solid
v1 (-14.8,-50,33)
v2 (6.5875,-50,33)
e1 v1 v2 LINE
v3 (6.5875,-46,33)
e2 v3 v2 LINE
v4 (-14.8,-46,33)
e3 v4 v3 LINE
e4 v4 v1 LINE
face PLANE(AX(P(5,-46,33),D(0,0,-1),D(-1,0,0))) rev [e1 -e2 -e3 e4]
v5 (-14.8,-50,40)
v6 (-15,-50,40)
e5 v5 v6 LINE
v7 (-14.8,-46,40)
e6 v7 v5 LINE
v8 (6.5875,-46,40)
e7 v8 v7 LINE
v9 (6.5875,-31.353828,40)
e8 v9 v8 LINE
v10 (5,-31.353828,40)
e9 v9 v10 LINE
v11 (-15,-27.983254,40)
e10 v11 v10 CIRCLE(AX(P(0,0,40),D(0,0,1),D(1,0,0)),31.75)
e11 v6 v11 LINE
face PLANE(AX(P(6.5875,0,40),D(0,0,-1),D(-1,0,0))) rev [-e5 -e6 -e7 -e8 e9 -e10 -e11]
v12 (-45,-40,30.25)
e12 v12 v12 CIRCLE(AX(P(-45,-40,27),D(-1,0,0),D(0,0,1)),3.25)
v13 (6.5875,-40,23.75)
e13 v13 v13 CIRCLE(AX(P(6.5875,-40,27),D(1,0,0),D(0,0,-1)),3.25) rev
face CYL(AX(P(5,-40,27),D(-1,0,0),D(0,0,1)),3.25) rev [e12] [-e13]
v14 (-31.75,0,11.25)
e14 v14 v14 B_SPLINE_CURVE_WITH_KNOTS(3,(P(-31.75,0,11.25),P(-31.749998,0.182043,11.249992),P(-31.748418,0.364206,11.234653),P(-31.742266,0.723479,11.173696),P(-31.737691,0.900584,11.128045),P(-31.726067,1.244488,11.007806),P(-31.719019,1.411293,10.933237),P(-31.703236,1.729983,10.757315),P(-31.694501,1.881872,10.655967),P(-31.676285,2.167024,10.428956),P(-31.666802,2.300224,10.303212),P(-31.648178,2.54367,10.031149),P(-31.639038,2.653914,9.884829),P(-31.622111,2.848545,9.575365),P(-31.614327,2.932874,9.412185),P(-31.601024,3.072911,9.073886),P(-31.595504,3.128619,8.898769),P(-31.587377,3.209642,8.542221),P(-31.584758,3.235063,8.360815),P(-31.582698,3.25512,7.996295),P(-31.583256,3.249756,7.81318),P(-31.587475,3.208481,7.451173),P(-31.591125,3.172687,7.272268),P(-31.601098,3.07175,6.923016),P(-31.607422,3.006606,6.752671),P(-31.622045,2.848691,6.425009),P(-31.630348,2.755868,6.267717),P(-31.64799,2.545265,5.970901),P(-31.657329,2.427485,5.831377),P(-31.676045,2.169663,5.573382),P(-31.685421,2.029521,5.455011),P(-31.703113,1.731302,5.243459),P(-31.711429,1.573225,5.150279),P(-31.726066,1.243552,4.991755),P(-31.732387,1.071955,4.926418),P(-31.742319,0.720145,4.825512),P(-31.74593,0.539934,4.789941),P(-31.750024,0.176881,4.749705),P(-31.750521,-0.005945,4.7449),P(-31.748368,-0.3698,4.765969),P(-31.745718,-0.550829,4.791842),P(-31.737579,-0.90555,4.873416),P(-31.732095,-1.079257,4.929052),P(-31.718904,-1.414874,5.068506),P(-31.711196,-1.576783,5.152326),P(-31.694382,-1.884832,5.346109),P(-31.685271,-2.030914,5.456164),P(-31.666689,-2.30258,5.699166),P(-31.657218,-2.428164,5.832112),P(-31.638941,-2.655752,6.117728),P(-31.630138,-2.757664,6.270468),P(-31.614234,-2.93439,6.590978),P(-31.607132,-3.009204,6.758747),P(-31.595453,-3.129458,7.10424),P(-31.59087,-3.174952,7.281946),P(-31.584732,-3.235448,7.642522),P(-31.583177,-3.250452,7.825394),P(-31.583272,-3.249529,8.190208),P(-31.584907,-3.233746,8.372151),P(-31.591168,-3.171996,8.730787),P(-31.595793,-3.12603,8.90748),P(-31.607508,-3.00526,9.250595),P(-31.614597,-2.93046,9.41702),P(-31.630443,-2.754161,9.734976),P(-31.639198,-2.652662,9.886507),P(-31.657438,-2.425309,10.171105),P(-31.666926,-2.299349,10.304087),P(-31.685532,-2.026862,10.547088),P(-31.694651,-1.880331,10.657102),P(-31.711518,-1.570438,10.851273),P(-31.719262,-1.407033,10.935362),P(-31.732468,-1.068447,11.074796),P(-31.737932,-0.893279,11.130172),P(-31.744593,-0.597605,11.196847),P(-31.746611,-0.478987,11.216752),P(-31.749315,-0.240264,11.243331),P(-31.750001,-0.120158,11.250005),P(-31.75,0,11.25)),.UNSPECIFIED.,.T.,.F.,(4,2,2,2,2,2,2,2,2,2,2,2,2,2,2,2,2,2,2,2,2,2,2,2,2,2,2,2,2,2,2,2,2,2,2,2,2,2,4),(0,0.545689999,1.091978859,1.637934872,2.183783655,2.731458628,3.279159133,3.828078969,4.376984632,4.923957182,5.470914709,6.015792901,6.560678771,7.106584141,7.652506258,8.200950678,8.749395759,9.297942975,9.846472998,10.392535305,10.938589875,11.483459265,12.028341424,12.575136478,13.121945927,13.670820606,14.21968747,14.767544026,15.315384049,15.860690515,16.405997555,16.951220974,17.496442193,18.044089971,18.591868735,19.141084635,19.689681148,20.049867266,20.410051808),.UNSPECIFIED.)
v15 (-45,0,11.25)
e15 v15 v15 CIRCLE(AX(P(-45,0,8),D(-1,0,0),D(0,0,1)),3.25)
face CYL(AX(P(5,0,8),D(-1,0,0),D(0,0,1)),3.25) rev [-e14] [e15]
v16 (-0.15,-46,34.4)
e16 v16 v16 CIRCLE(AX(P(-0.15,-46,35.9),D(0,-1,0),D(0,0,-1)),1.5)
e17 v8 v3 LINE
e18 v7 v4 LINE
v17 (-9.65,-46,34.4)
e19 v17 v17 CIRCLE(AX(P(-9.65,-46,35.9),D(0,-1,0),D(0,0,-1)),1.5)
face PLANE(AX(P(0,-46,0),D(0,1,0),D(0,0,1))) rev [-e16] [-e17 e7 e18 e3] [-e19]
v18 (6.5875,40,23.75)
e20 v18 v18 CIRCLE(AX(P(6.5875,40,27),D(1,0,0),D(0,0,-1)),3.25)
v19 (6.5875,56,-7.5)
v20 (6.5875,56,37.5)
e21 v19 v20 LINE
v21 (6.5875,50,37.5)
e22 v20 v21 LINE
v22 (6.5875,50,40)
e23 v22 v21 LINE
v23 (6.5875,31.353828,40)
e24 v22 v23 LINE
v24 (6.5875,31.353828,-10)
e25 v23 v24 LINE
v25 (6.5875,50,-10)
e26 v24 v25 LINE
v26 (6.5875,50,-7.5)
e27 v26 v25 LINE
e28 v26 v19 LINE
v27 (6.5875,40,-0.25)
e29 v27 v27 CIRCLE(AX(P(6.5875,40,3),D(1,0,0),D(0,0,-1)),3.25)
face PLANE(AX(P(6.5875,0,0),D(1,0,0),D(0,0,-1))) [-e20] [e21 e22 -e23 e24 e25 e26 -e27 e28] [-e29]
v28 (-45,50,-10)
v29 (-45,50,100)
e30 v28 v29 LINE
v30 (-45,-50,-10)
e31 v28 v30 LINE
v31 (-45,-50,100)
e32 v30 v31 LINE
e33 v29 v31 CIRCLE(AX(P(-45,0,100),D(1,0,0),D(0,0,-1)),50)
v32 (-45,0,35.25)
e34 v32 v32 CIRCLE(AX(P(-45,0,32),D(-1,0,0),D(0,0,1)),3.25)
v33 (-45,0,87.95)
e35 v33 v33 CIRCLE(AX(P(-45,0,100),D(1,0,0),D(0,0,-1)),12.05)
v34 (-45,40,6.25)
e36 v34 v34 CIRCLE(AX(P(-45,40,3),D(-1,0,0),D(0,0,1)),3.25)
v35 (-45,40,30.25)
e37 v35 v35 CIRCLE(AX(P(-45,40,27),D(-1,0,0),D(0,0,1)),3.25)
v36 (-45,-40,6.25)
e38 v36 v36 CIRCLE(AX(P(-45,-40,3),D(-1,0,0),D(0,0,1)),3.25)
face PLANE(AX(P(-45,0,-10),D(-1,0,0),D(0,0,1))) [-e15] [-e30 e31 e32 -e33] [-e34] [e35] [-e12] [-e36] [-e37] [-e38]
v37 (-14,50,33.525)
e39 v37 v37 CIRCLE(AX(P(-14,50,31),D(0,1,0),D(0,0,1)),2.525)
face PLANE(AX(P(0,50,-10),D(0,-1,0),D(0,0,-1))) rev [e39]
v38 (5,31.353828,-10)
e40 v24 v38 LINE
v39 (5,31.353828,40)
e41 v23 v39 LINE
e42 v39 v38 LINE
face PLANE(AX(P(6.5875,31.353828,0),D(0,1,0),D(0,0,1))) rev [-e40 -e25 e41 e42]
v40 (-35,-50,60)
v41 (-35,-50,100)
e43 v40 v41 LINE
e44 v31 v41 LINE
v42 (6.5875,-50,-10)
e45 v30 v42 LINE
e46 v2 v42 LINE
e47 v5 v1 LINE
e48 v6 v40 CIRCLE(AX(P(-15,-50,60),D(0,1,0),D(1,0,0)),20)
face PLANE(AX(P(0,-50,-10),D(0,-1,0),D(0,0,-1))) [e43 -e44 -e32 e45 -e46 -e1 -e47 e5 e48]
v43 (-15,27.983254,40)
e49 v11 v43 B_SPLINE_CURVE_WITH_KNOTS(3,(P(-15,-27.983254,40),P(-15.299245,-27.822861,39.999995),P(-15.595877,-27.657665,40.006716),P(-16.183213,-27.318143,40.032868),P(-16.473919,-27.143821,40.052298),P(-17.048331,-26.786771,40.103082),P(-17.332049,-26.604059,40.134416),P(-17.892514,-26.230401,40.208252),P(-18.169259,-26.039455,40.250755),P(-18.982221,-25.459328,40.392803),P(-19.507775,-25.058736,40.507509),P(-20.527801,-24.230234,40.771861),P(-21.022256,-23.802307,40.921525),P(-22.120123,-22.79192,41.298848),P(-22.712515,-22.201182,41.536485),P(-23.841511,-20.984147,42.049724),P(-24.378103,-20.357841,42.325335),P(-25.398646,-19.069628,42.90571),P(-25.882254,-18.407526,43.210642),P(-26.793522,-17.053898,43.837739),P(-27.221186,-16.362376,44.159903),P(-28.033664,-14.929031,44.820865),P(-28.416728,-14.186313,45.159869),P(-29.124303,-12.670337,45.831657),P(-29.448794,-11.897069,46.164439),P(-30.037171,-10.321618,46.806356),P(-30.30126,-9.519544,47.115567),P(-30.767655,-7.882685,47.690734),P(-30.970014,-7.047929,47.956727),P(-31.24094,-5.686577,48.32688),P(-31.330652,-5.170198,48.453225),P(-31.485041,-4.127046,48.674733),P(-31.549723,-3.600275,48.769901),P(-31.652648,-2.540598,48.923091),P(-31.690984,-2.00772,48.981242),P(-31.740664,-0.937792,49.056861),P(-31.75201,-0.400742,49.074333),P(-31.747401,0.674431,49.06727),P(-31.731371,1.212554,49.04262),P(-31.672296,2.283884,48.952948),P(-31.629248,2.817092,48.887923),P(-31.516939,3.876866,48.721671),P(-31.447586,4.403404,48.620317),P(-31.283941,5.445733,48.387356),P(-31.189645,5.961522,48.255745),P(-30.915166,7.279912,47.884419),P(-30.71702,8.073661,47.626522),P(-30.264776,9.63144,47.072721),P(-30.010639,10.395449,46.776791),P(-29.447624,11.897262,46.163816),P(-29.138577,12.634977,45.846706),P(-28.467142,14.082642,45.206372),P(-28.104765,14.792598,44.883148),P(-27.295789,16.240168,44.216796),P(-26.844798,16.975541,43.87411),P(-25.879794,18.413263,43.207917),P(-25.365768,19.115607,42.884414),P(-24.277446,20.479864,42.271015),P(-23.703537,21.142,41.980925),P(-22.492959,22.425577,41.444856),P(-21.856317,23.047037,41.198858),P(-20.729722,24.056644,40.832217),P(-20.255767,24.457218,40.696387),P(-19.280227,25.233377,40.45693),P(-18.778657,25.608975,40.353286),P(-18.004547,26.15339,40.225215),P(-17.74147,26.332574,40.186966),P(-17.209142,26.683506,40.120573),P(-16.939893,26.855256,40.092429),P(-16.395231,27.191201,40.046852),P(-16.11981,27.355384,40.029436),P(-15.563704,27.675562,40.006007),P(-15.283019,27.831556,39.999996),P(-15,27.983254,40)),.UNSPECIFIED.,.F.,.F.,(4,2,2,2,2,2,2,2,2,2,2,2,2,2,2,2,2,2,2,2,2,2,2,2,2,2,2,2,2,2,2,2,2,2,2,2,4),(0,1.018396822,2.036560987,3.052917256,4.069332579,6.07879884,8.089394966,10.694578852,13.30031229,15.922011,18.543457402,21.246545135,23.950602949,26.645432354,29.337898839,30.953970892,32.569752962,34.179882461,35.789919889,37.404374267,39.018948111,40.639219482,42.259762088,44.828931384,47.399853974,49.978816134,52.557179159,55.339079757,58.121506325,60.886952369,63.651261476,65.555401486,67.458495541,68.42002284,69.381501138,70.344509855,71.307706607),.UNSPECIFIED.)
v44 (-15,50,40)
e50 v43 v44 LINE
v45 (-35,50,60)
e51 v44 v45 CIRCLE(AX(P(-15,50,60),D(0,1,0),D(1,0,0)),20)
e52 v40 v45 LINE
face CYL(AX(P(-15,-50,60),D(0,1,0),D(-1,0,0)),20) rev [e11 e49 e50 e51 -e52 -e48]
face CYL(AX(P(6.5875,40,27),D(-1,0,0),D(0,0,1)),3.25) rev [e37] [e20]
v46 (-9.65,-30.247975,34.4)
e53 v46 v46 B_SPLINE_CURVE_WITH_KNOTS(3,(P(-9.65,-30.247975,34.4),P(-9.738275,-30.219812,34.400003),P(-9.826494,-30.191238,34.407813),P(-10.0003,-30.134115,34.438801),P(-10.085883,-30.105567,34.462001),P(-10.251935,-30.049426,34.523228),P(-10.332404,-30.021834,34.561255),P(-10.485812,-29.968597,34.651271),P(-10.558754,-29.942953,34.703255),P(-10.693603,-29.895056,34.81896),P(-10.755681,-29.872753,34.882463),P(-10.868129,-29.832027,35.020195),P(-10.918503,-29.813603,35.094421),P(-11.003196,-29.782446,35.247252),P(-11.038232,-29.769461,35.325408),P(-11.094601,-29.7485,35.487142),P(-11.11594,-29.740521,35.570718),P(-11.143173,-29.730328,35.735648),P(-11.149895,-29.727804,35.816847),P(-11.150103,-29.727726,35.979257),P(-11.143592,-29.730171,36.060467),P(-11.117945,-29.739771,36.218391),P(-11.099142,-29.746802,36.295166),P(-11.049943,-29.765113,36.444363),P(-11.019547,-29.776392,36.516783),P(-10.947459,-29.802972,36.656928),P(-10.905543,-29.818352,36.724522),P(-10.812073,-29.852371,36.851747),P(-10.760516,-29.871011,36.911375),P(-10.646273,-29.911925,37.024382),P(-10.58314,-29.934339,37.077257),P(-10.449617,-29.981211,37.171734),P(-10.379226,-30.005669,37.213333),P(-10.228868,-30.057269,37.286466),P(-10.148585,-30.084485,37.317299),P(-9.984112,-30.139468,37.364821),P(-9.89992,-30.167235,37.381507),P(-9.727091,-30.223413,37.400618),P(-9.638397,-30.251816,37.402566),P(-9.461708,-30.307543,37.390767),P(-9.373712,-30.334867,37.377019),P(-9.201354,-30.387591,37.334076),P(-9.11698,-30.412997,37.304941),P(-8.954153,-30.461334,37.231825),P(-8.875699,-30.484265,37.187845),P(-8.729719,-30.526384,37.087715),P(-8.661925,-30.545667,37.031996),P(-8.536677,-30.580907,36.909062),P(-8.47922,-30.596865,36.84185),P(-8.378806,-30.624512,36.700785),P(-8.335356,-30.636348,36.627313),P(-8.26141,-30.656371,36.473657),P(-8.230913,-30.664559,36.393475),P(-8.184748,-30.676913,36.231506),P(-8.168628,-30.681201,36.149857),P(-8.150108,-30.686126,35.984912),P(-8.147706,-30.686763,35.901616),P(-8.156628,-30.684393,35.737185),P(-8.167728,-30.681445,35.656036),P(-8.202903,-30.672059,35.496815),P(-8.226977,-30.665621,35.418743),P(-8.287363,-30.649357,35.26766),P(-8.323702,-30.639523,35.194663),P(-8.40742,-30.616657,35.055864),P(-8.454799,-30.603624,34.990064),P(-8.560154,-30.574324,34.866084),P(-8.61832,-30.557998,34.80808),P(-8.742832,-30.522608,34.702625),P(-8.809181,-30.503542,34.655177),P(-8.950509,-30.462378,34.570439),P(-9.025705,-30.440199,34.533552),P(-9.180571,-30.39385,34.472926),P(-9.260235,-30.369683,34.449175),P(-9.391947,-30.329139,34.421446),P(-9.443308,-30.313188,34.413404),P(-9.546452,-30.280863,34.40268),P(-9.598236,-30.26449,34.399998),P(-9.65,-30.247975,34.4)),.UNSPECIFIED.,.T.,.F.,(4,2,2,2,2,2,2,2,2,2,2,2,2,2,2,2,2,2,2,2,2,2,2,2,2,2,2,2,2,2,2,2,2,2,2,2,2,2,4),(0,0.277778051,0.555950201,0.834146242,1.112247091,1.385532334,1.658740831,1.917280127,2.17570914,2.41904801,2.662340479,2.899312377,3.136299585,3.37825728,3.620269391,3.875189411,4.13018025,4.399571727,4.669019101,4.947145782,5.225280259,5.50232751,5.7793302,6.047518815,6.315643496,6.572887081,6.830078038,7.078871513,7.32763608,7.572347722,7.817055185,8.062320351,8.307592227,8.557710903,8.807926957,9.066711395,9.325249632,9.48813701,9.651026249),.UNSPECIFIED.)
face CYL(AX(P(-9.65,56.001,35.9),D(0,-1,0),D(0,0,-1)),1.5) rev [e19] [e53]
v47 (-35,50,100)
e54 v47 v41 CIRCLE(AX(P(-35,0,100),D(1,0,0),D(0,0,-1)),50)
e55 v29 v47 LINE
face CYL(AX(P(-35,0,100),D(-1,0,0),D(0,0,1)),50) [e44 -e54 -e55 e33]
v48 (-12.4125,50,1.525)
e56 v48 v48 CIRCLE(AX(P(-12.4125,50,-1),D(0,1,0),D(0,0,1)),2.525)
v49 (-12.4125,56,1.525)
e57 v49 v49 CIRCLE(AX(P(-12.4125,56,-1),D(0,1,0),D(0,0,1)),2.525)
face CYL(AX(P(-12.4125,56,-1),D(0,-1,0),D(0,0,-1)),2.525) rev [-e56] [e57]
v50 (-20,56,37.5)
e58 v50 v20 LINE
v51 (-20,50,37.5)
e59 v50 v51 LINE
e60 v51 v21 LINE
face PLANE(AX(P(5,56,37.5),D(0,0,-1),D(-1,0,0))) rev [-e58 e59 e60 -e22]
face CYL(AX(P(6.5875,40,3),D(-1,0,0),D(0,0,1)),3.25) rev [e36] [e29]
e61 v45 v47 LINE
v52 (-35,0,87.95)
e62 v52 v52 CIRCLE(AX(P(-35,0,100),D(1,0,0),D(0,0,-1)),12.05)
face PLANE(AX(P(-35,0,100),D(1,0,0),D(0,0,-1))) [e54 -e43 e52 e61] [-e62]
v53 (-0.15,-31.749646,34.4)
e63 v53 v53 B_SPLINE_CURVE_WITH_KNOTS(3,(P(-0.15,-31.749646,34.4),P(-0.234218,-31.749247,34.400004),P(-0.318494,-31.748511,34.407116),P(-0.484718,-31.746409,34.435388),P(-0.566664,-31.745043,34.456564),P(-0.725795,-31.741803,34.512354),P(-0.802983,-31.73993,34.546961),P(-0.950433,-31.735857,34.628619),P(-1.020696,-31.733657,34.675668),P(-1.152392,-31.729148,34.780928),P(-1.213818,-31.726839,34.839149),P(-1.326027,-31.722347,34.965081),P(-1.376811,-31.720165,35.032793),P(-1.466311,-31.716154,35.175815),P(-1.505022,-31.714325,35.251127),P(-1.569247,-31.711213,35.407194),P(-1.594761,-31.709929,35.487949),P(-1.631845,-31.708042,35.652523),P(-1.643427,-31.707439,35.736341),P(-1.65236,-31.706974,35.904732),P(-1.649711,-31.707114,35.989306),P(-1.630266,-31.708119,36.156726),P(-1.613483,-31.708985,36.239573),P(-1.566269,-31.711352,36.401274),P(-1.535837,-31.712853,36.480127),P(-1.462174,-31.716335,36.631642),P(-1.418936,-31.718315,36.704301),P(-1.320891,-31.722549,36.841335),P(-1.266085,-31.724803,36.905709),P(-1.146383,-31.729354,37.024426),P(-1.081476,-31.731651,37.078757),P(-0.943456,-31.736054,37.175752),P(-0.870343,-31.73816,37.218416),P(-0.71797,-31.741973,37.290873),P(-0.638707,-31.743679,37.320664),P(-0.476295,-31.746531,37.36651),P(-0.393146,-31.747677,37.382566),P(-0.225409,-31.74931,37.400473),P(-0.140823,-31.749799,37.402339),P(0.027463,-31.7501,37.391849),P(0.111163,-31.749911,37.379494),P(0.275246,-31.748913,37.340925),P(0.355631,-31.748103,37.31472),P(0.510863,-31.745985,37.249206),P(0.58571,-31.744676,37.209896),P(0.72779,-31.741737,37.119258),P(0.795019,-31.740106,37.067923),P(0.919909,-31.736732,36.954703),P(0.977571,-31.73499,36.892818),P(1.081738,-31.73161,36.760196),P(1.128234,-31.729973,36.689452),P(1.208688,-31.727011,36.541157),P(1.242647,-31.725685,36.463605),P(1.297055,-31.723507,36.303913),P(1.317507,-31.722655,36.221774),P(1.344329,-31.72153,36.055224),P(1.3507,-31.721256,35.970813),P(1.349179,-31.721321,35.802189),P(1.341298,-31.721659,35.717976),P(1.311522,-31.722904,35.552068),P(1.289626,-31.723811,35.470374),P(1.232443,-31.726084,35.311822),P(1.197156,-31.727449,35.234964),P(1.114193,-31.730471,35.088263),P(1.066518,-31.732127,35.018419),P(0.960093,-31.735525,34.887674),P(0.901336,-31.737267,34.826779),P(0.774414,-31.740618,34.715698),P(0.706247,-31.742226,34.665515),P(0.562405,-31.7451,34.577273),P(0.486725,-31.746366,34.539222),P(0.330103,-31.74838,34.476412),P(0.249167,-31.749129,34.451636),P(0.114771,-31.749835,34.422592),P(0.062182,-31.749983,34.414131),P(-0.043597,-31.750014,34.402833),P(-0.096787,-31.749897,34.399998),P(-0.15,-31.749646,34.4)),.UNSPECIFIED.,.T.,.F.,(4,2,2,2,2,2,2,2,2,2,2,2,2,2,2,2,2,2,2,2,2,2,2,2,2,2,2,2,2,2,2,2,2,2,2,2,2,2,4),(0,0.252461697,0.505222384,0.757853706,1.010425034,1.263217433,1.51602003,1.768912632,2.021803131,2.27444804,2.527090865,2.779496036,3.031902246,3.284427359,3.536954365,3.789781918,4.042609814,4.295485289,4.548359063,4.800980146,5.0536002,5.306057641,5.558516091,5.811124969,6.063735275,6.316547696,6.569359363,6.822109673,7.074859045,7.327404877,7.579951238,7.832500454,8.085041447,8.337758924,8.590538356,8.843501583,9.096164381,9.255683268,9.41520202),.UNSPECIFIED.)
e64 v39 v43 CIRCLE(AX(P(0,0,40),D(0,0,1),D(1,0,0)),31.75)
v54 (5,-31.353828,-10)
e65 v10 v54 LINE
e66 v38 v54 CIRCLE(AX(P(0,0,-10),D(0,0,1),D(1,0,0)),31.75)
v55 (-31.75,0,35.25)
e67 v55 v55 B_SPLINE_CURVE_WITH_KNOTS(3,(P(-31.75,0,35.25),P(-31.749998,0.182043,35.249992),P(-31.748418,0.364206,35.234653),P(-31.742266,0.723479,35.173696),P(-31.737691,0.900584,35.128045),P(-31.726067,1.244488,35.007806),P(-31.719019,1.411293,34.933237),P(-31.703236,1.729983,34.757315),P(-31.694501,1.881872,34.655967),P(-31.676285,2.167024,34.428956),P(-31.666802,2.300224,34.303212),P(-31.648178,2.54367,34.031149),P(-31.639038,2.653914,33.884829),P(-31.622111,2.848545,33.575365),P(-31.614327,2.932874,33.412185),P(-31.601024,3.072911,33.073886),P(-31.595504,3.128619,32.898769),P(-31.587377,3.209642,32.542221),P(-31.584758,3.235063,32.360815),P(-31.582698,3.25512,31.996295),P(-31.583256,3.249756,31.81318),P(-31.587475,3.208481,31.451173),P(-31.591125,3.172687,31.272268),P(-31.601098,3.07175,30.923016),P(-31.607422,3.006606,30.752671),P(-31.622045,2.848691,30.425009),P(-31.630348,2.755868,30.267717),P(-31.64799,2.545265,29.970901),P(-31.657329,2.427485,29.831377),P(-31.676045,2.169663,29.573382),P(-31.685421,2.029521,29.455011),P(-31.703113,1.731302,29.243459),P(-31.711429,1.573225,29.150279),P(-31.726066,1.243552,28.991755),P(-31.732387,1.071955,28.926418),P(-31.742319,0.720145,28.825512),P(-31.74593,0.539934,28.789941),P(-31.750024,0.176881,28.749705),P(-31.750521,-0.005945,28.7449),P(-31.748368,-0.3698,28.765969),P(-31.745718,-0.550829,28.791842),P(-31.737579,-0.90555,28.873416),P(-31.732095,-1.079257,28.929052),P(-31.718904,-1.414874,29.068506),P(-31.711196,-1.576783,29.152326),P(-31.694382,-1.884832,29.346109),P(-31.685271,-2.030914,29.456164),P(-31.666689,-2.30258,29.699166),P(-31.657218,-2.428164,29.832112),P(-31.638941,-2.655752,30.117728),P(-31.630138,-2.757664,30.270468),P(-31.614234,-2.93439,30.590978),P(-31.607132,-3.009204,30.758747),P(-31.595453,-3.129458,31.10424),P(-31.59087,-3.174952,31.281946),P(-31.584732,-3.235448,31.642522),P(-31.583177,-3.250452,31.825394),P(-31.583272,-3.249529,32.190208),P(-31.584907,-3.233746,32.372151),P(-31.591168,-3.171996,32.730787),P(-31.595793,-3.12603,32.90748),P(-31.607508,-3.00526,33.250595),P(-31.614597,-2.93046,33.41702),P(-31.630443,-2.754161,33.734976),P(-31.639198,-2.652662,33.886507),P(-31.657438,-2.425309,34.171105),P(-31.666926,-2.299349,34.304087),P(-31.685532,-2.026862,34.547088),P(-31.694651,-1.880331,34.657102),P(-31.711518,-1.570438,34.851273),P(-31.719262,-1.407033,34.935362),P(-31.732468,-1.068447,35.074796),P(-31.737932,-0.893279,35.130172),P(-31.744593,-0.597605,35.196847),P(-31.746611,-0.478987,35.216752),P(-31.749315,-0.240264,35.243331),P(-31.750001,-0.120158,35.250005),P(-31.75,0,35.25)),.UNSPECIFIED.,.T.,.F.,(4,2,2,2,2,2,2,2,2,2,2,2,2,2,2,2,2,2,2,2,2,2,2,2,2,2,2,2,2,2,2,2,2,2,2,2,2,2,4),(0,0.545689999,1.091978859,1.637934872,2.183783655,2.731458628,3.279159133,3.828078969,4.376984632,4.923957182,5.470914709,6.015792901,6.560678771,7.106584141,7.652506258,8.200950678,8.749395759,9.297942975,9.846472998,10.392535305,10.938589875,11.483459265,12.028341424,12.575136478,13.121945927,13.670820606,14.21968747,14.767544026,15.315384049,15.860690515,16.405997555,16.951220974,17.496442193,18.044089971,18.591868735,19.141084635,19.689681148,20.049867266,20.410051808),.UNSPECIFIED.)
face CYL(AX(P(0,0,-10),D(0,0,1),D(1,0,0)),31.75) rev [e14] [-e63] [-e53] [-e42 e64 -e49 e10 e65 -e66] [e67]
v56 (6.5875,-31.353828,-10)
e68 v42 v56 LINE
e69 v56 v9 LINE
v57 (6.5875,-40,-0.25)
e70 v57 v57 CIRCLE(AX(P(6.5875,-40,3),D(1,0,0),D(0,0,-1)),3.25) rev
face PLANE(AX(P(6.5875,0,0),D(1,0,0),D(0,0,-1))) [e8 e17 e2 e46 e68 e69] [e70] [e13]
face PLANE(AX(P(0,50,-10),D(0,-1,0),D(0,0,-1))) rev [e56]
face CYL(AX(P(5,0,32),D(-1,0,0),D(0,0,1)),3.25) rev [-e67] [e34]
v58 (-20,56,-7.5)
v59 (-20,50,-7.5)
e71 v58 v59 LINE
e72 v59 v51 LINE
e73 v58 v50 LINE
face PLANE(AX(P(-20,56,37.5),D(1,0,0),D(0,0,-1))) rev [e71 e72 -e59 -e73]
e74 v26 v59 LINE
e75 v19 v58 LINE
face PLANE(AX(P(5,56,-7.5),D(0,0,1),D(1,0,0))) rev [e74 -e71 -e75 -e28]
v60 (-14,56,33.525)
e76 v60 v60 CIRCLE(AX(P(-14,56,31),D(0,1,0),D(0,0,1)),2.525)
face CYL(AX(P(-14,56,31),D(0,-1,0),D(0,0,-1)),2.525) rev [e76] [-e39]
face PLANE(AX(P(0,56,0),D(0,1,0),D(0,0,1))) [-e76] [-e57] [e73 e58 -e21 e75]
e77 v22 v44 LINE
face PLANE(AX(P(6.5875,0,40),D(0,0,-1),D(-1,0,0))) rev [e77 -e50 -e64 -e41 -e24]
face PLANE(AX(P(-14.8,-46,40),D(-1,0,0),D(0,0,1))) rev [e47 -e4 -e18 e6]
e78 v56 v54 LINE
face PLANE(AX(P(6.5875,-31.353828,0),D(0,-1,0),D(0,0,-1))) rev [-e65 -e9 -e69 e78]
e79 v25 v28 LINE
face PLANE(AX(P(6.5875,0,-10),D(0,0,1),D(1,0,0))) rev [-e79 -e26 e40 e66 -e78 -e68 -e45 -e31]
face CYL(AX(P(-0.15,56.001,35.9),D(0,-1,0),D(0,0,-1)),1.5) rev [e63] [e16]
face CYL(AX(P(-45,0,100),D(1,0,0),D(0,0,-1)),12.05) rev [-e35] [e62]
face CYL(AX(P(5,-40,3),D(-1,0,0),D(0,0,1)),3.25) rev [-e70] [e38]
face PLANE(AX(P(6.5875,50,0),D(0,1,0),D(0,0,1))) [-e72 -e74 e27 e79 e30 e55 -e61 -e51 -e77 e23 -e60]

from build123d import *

# Parameters (mm, degrees)
CENTRE_HOLE_FOR_L2_DEPTH      = 40
CENTRE_HOLE_FOR_L2_DEPTH_BACK = 10
SKETCH1_R                     = 39.1
SKETCH1_R_2                   = 31.75
MAIN_STRUCTURE_DEPTH          = 60
MAIN_STRUCTURE_DEPTH_BACK     = 50
SKETCH2_W                     = 90
SKETCH2_H                     = 100
SKETCH2_R                     = 31.75
BEARING_CURVE_DEPTH           = 10
SKETCH6_R                     = 10.5
SHAFT_HOLE_DEPTH              = 10
WRIST_CUTOUT_DEPTH            = 186.809041761
SURFACECUT1_START             = 5
SURFACECUT1_OUTLINE_R         = 10.5
SURFACECUT1_DEPTH             = 40
SKETCH11_W                    = 25
SKETCH11_H                    = 45
SKETCH11_R                    = 2.525
BOSS_EXTRUDE1_DEPTH           = 6
SKETCH15_W                    = 19.8
SKETCH15_H                    = 7
CUT_EXTRUDE4_DEPTH            = 4
CUT_EXTRUDE5_REACH            = 188.893
CUT_EXTRUDE5_END_RADIUS       = 31.75
SKETCH16_R                    = 1.5
CUT_EXTRUDE6_DEPTH            = 168.7378908
CUT_EXTRUDE6_DEPTH_BACK       = 168.7378908
SKETCH18_R                    = 3.25
SKETCH19_R                    = 3.25
CUT_EXTRUDE7_DEPTH            = 168.7378908
SKETCH9_R                     = 12.05
CUT_EXTRUDE8_DEPTH            = 10
SKETCH20_R                    = 3.25
SKETCH20_W                    = 45
SKETCH20_H                    = 6
BOSS_EXTRUDE2_DEPTH           = 1.5875


# Read off the part's stored shape, not the designer's step: SurfaceCut1
with BuildPart() as part:
    # Sketch1 → Centre Hole for L2 (new, two sides: drawn at the far end of the back side and taken through both)
    with BuildSketch(Plane.XY.offset(-CENTRE_HOLE_FOR_L2_DEPTH_BACK)):
        Circle(SKETCH1_R)
        Circle(SKETCH1_R_2, mode=Mode.SUBTRACT)
    extrude(amount=CENTRE_HOLE_FOR_L2_DEPTH + CENTRE_HOLE_FOR_L2_DEPTH_BACK)


with BuildPart() as body_2:
    # Sketch2 → Main Structure (new, two sides: drawn at the far end of the back side and taken through both)
    with BuildSketch(Plane.XY.offset(40).offset(-MAIN_STRUCTURE_DEPTH_BACK)):
        Rectangle(SKETCH2_W, SKETCH2_H)
        Circle(SKETCH2_R, mode=Mode.SUBTRACT)
    extrude(amount=MAIN_STRUCTURE_DEPTH + MAIN_STRUCTURE_DEPTH_BACK)

    # Sketch3 → Bearing Curve (add)
    with BuildSketch(Plane.ZY.offset(45)):
        with BuildLine():
            Line((100, 50), (100, -50))
            ThreePointArc((100, -50), (150, 0), (100, 50))
        make_face()
    bearing_curve = extrude(amount=-BEARING_CURVE_DEPTH)

    # Upright Mirror: Bearing Curve across plane
    add(bearing_curve.mirror(Plane(origin=(0, 0, 0), x_dir=(0, 0, 1), z_dir=(1, 0, 0))))

    # Sketch6 → Shaft Hole (cut)
    with BuildSketch(Plane.ZY.offset(45)):
        with Locations((100, 0)):
            Circle(SKETCH6_R)
    shaft_hole = extrude(amount=-SHAFT_HOLE_DEPTH, mode=Mode.SUBTRACT)

    # Sketch4 → Wrist Cutout (cut, through all)
    with BuildSketch(Plane(origin=(0, 50, 0), x_dir=(1, 0, 0), z_dir=(0, 1, 0))):
        with BuildLine():
            Line((-35, -100), (-35, -60))
            ThreePointArc((-35, -60), (-29.142135624, -45.857864376), (-15, -40))
            Line((-15, -40), (15, -40))
            ThreePointArc((15, -40), (29.142135624, -45.857864376), (35, -60))
            Line((35, -60), (35, -100))
            Line((35, -100), (-35, -100))
        make_face()
    extrude(amount=-WRIST_CUTOUT_DEPTH, mode=Mode.SUBTRACT)

    # Bearing Mirror: Shaft Hole across plane
    add(shaft_hole.mirror(Plane(origin=(0, 0, 0), x_dir=(0, 0, 1), z_dir=(1, 0, 0))), mode=Mode.SUBTRACT)


with BuildPart() as surfacecut1_tool:
    # SurfaceCut1 outline → SurfaceCut1 (new body)
    with BuildSketch(Plane.YZ.offset(SURFACECUT1_START)):
        with BuildLine():
            ThreePointArc((50, 100), (0, 150), (-50, 100))
            Line((-50, 100), (-50, -10))
            Line((-50, -10), (50, -10))
            Line((50, -10), (50, 100))
        make_face()
        with Locations((0, 100)):
            Circle(SURFACECUT1_OUTLINE_R, mode=Mode.SUBTRACT)
    extrude(amount=SURFACECUT1_DEPTH)


with BuildPart() as part_1:
    add(part.part)

    # SurfaceCut1: cut by surfacecut1_tool
    add(surfacecut1_tool.part, mode=Mode.SUBTRACT)


with BuildPart() as body_2_1:
    add(body_2.part)

    # SurfaceCut1: cut by surfacecut1_tool
    add(surfacecut1_tool.part, mode=Mode.SUBTRACT)

    # Sketch15 → Cut-Extrude4 (cut)
    with BuildSketch(Plane(origin=(0, -50, 0), x_dir=(-1, 0, 0), z_dir=(0, -1, 0))):
        with Locations((4.9, -36.5)):
            Rectangle(SKETCH15_W, SKETCH15_H)
    extrude(amount=-CUT_EXTRUDE4_DEPTH, mode=Mode.SUBTRACT)


with BuildPart() as body_3:
    # Sketch11 → Boss-Extrude1 (new body)
    with BuildSketch(Plane(origin=(0, 50, 0), x_dir=(1, 0, 0), z_dir=(0, 1, 0))):
        with Locations((-7.5, -15)):
            Rectangle(SKETCH11_W, SKETCH11_H)
        with Locations(Location((-12.4125, 1, 0), (0, 0, 270))):
            Circle(SKETCH11_R, mode=Mode.SUBTRACT)
        with Locations(Location((-14, -31, 0), (0, 0, 270))):
            Circle(SKETCH11_R, mode=Mode.SUBTRACT)
    extrude(amount=BOSS_EXTRUDE1_DEPTH)


with BuildPart() as cut_extrude5_tool:
    # Cut-Extrude5: up to this cylinder (the profile starts outside it)
    cut_extrude5_end = Plane(origin=(0, 0, 35.9), z_dir=(0, 0, 1)) * Cylinder(CUT_EXTRUDE5_END_RADIUS, 442.286, mode=Mode.PRIVATE)
    # Sketch16 → Cut-Extrude5 (new, up to the surface)
    with BuildSketch(Plane(origin=(0, -46, 0), x_dir=(-1, 0, 0), z_dir=(0, -1, 0)), mode=Mode.PRIVATE) as cut_extrude5_sk1:
        with Locations(Location((9.65, -35.9, 0), (0, 0, 90))):
            Circle(SKETCH16_R)
    cut_extrude5_tool1 = extrude(cut_extrude5_sk1.sketch, amount=-CUT_EXTRUDE5_REACH, mode=Mode.PRIVATE) - cut_extrude5_end
    add(cut_extrude5_tool1.solids().sort_by_distance((-9.65, -46, 35.9))[0])
    # Sketch16 → Cut-Extrude5 (new, up to the surface)
    with BuildSketch(Plane(origin=(0, -46, 0), x_dir=(-1, 0, 0), z_dir=(0, -1, 0)), mode=Mode.PRIVATE) as cut_extrude5_sk2:
        with Locations(Location((0.15, -35.9, 0), (0, 0, 90))):
            Circle(SKETCH16_R)
    cut_extrude5_tool2 = extrude(cut_extrude5_sk2.sketch, amount=-CUT_EXTRUDE5_REACH, mode=Mode.PRIVATE) - cut_extrude5_end
    add(cut_extrude5_tool2.solids().sort_by_distance((-0.15, -46, 35.9))[0])


with BuildPart() as part_2:
    add(part_1.part)

    # Cut-Extrude5: cut by cut_extrude5_tool
    add(cut_extrude5_tool.part, mode=Mode.SUBTRACT)


with BuildPart() as body_2_2:
    add(body_2_1.part)

    # Cut-Extrude5: cut by cut_extrude5_tool
    add(cut_extrude5_tool.part, mode=Mode.SUBTRACT)


with BuildPart() as cut_extrude6_tool:
    # Sketch18 → Cut-Extrude6 (new, two sides: drawn at the far end of the back side and taken through both)
    with BuildSketch(Plane.ZY.offset(45).offset(-CUT_EXTRUDE6_DEPTH_BACK)):
        with Locations((8, 0)):
            Circle(SKETCH18_R)
        with Locations((32, 0)):
            Circle(SKETCH18_R)
    extrude(amount=CUT_EXTRUDE6_DEPTH + CUT_EXTRUDE6_DEPTH_BACK)


with BuildPart() as part_3:
    add(part_2.part)

    # Cut-Extrude6: cut by cut_extrude6_tool
    add(cut_extrude6_tool.part, mode=Mode.SUBTRACT)


with BuildPart() as body_2_3:
    add(body_2_2.part)

    # Cut-Extrude6: cut by cut_extrude6_tool
    add(cut_extrude6_tool.part, mode=Mode.SUBTRACT)


with BuildPart() as cut_extrude7_tool:
    # Sketch19 → Cut-Extrude7 (new, through all)
    with BuildSketch(Plane.ZY.offset(45)):
        with Locations((32, 0)):
            Circle(SKETCH19_R)
        with Locations((8, 0)):
            Circle(SKETCH19_R)
        with Locations((3, 40)):
            Circle(SKETCH19_R)
        with Locations((27, 40)):
            Circle(SKETCH19_R)
        with Locations((3, -40)):
            Circle(SKETCH19_R)
        with Locations((27, -40)):
            Circle(SKETCH19_R)
    extrude(amount=-CUT_EXTRUDE7_DEPTH)


with BuildPart() as part_4:
    add(part_3.part)

    # Cut-Extrude7: cut by cut_extrude7_tool
    add(cut_extrude7_tool.part, mode=Mode.SUBTRACT)



with BuildPart() as body_2_4:
    add(body_2_3.part)

    # Cut-Extrude7: cut by cut_extrude7_tool
    add(cut_extrude7_tool.part, mode=Mode.SUBTRACT)

    # Sketch9 → Cut-Extrude8 (cut)
    with BuildSketch(Plane(origin=(-35, 0, 0), x_dir=(0, 0, -1), z_dir=(1, 0, 0))):
        with Locations((-100, 0)):
            Circle(SKETCH9_R)
    extrude(amount=-CUT_EXTRUDE8_DEPTH, mode=Mode.SUBTRACT)


with BuildPart() as part_5:
    add(part_4.part)

    add(body_2_4.part)  # Boss-Extrude2 merges body 2

    add(body_3.part)  # Boss-Extrude2 merges body 3
    # Sketch20 → Boss-Extrude2 (add)
    # profile 1 of 3: a face of its own
    with BuildSketch(Plane(origin=(5, 0, 0), x_dir=(0, 0, -1), z_dir=(1, 0, 0))):
        Polygon((-40, 50), (-40, 38.778989157), (-40, 31.353827518), (10, 31.353827518), (10, 38.778989157), (10, 50), (7.5, 50), (-37.5, 50), align=None)
        with Locations(Location((-27, 40, 0), (0, 0, 180))):
            Circle(SKETCH20_R, mode=Mode.SUBTRACT)
        with Locations(Location((-3, 40, 0), (0, 0, 180))):
            Circle(SKETCH20_R, mode=Mode.SUBTRACT)
    # profile 2 of 3: a face of its own
    with BuildSketch(Plane(origin=(5, 0, 0), x_dir=(0, 0, -1), z_dir=(1, 0, 0))):
        with Locations((-15, 53)):
            Rectangle(SKETCH20_W, SKETCH20_H)
    # profile 3 of 3: a face of its own
    with BuildSketch(Plane(origin=(5, 0, 0), x_dir=(0, 0, -1), z_dir=(1, 0, 0))):
        Polygon((10, -50), (10, -38.778989157), (10, -31.353827518), (-40, -31.353827518), (-40, -38.778989157), (-40, -46), (-33, -46), (-33, -50), align=None)
        with Locations(Location((-27, -40, 0), (0, 0, 180))):
            Circle(SKETCH20_R, mode=Mode.SUBTRACT)
        with Locations(Location((-3, -40, 0), (0, 0, 180))):
            Circle(SKETCH20_R, mode=Mode.SUBTRACT)
    extrude(amount=BOSS_EXTRUDE2_DEPTH)


solid = part_5.part
